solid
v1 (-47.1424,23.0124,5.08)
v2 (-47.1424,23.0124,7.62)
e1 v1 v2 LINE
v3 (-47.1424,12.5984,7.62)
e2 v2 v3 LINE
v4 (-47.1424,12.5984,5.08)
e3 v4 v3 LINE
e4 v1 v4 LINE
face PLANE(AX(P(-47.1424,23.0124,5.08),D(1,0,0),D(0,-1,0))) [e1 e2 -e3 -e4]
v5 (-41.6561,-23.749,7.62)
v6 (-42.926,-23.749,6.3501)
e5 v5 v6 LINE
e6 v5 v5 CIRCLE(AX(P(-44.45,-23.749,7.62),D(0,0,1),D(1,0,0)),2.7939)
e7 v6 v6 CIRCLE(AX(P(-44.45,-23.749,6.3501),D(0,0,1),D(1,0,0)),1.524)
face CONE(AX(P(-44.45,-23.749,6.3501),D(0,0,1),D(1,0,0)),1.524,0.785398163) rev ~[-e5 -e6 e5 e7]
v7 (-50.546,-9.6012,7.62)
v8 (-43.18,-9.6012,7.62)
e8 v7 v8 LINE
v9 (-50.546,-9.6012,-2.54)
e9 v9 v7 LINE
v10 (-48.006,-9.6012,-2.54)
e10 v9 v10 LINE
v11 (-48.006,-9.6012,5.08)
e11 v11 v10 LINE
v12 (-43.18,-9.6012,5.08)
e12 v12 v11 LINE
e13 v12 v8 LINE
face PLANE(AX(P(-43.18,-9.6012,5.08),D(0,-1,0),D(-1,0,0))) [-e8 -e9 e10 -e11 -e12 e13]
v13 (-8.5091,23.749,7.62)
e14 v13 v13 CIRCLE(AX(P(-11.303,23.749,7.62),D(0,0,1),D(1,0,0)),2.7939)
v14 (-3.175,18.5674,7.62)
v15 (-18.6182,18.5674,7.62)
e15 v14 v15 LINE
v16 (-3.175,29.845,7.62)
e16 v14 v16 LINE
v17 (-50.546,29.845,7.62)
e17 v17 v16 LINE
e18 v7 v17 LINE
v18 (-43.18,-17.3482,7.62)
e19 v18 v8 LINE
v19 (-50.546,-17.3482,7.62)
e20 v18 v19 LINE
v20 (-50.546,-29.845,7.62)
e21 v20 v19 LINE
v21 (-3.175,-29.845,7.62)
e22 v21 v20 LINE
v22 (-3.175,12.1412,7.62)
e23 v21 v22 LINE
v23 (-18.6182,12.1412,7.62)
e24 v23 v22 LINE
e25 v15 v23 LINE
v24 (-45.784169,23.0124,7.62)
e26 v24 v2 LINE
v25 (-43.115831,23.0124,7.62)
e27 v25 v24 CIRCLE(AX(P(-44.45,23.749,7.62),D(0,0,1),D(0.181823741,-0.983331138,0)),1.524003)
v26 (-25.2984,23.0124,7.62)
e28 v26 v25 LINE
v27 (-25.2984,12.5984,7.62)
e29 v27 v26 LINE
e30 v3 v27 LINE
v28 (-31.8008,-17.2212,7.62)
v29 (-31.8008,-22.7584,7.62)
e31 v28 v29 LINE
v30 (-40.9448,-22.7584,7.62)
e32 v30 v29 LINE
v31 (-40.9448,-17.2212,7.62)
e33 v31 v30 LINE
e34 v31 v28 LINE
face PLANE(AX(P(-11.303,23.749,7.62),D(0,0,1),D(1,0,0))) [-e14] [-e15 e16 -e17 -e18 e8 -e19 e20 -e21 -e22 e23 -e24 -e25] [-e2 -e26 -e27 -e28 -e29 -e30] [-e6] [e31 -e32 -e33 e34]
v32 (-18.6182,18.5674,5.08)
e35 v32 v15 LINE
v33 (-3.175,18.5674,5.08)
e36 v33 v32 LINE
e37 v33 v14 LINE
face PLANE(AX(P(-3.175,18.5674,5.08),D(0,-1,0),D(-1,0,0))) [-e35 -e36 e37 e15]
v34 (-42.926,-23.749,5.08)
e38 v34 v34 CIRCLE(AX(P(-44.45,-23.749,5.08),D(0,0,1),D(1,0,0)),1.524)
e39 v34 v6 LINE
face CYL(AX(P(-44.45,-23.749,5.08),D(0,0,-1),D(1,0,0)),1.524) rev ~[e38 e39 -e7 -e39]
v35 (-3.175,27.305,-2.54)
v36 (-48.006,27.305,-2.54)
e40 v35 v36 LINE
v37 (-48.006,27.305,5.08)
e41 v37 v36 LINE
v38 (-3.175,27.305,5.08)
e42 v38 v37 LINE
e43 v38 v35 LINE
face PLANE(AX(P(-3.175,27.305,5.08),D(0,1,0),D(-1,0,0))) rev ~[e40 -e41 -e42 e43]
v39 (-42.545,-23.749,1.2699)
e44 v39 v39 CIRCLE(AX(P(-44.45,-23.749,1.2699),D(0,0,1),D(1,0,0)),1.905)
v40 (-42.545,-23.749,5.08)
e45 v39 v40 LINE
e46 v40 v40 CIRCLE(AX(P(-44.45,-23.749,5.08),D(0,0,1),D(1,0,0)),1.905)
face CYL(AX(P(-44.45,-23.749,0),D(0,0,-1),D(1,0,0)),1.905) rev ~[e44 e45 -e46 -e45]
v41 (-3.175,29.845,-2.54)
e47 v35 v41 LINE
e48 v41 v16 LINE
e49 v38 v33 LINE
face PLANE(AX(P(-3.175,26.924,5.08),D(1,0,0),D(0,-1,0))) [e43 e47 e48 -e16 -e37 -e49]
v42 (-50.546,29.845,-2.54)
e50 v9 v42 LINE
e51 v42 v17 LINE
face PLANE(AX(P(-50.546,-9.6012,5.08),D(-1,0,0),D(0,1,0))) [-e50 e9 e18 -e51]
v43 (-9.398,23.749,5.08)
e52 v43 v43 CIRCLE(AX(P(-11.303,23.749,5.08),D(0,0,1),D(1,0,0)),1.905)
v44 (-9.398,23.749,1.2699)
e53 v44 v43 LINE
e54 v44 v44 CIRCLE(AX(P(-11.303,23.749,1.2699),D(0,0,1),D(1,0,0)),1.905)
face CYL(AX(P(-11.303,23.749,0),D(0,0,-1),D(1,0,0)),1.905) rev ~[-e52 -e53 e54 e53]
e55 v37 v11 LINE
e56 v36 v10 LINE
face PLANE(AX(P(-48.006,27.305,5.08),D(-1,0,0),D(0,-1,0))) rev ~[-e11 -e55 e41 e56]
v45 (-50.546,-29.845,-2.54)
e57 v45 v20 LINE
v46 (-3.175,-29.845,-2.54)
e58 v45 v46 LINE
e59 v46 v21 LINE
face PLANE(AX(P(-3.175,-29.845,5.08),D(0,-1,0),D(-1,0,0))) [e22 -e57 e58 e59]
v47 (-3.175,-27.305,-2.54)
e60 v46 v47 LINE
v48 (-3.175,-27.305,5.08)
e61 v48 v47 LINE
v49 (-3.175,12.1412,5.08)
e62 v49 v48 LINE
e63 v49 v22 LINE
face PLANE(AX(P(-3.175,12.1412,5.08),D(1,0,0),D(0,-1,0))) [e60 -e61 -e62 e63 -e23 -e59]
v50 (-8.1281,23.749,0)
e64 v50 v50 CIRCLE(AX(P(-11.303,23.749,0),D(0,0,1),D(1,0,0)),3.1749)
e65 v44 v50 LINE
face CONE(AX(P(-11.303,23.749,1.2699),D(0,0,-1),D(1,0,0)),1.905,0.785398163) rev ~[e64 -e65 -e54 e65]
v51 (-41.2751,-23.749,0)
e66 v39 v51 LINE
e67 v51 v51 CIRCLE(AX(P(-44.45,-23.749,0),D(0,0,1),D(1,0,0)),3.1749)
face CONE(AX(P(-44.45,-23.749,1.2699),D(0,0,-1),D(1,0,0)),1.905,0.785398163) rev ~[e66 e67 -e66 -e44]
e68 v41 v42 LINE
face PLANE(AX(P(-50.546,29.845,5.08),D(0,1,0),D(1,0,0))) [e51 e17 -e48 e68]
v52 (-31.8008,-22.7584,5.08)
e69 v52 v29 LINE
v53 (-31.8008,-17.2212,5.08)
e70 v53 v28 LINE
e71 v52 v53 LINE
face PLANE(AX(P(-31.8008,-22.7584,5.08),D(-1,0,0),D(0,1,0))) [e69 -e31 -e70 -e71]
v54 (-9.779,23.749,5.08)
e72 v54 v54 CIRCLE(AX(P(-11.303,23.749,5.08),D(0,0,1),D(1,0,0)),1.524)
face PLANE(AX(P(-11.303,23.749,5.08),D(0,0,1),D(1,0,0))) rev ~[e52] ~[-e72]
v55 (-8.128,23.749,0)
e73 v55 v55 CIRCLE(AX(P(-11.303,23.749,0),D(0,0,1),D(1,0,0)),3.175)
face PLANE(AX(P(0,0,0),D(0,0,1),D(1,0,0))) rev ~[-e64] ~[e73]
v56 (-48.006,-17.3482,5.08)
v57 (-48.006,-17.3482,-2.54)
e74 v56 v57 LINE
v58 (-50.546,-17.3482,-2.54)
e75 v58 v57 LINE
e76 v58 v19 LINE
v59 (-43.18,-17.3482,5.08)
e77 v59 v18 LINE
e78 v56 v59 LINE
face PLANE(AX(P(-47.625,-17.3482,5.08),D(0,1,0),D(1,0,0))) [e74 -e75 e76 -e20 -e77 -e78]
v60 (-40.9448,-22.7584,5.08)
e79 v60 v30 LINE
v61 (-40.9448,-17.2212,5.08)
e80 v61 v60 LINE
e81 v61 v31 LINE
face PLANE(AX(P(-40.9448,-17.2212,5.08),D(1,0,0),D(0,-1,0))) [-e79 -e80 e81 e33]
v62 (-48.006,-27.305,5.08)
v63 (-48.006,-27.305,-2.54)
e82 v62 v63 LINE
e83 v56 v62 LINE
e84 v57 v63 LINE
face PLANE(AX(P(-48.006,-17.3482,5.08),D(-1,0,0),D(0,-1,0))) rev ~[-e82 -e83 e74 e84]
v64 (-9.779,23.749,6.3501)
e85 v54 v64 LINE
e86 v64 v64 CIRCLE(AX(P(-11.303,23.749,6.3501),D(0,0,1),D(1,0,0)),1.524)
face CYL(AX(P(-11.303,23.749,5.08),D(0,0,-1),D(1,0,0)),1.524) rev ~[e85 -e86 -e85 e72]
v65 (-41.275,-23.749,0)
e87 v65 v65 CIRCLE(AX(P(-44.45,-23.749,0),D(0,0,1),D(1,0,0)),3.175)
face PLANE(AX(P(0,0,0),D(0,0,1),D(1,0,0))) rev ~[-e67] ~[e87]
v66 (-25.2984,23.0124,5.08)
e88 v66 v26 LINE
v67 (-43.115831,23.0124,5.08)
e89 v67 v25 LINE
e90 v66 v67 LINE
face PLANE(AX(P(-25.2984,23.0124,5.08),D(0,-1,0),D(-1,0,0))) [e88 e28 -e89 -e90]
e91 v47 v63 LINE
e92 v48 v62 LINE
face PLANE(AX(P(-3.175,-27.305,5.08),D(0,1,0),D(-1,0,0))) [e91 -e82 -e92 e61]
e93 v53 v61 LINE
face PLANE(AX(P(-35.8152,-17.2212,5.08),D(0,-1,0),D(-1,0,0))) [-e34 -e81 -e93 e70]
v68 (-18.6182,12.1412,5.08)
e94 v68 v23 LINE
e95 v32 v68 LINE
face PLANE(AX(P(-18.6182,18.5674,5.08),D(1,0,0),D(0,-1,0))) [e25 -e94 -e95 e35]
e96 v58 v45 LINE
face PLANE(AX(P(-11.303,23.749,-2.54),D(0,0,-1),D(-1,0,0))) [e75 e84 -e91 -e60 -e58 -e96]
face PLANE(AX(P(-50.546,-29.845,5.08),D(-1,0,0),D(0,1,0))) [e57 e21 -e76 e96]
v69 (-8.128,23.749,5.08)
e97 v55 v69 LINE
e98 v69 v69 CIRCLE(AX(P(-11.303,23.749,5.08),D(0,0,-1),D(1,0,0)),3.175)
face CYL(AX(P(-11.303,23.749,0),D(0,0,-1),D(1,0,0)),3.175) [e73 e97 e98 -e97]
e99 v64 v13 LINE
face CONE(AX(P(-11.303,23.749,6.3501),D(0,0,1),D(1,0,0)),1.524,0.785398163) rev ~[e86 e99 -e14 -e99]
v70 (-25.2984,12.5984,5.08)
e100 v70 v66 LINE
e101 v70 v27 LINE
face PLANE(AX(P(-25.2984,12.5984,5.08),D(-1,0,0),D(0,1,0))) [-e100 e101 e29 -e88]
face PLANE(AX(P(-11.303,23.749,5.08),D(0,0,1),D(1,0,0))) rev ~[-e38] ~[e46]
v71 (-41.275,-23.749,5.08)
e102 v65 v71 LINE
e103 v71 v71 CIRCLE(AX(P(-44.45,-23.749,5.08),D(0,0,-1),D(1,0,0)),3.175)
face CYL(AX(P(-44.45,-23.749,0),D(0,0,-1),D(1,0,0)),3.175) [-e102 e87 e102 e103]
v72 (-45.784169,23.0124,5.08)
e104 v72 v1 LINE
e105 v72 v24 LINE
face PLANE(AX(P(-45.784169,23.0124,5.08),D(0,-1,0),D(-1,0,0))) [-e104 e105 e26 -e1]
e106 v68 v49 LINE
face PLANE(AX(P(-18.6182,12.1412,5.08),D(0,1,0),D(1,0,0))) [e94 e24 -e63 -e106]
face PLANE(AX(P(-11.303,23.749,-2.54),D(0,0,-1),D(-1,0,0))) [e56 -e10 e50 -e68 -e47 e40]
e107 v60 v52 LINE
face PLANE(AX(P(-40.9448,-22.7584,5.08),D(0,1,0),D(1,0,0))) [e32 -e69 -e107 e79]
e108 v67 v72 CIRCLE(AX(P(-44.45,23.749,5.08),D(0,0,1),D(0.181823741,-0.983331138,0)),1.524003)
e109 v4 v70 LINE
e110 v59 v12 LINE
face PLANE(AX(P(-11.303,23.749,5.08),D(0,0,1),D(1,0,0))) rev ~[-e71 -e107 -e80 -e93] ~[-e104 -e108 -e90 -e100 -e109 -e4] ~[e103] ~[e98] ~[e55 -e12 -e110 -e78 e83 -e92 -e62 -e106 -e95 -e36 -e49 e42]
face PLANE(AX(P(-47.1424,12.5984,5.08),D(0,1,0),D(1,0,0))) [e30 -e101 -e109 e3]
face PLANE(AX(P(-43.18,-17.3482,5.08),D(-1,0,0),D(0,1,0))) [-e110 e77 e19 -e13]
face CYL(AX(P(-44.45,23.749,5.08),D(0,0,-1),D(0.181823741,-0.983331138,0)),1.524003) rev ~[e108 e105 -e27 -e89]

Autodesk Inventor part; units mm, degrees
ref_plane "YZ Plane" through (0, 0, 0) normal (1, 0, 0) x (0, 1, 0)
ref_plane "XZ Plane" through (0, 0, 0) normal (0, 1, 0) x (-1, 0, 0)
ref_plane "XY Plane" through (0, 0, 0) normal (0, 0, 1) x (1, 0, 0)
ref_plane "Work Plane1" through (0, 0, 0) normal (0, 0, 1) x (1, 0, 0)
sketch "Sketch1" plane through (0, 0, 0) normal (0, 0, 1) x (1, 0, 0)
  line L0 (-4.2367, 12.7508) -> (-4.2367, 12.8143) projected
  line L1 (-4.2367, 12.8143) -> (-9.3167, 12.8143) projected
  line L2 (-9.3167, 12.8143) -> (-9.3167, 17.8943) projected
  line L3 (-9.3167, 17.8943) -> (-4.2367, 17.8943) projected
  line L4 (-4.2367, 17.8943) -> (-4.2367, 17.9578) projected
  line L5 (-4.2367, 17.9578) -> (-3.3223, 17.9578) projected
  line L6 (-3.3223, 17.9578) -> (-3.3223, 12.7508) projected
  line L7 (-3.3223, 12.7508) -> (-4.2367, 12.7508) projected
  line L8 (-13.0251, 13.6652) -> (-13.0251, 17.0434) projected
  arc A0 (-12.2631, 17.8054) -> (-13.0251, 17.0434) centre (-12.2631, 17.0434) ccw projected
  line L9 (-12.2631, 17.8054) -> (-11.3741, 17.8054) projected
  arc A1 (-10.6121, 17.0434) -> (-11.3741, 17.8054) centre (-11.3741, 17.0434) ccw projected
  line L10 (-10.6121, 17.0434) -> (-10.6121, 13.6652) projected
  arc A2 (-11.3741, 12.9032) -> (-10.6121, 13.6652) centre (-11.3741, 13.6652) ccw projected
  line L11 (-11.3741, 12.9032) -> (-12.2631, 12.9032) projected
  arc A3 (-13.0251, 13.6652) -> (-12.2631, 12.9032) centre (-12.2631, 13.6652) ccw projected
  line L12 (-15.4407, 13.6652) -> (-15.4407, 17.0434) projected
  arc A4 (-14.6787, 17.8054) -> (-15.4407, 17.0434) centre (-14.6787, 17.0434) ccw projected
  line L13 (-14.6787, 17.8054) -> (-13.7897, 17.8054) projected
  arc A5 (-13.0277, 17.0434) -> (-13.7897, 17.8054) centre (-13.7897, 17.0434) ccw projected
  line L14 (-13.0277, 17.0434) -> (-13.0277, 13.6652) projected
  arc A6 (-13.7897, 12.9032) -> (-13.0277, 13.6652) centre (-13.7897, 13.6652) ccw projected
  line L15 (-13.7897, 12.9032) -> (-14.6787, 12.9032) projected
  arc A7 (-15.4407, 13.6652) -> (-14.6787, 12.9032) centre (-14.6787, 13.6652) ccw projected
  line L16 (-17.8562, 13.6652) -> (-17.8562, 17.0434) projected
  arc A8 (-17.0942, 17.8054) -> (-17.8562, 17.0434) centre (-17.0942, 17.0434) ccw projected
  line L17 (-17.0942, 17.8054) -> (-16.2052, 17.8054) projected
  arc A9 (-15.4432, 17.0434) -> (-16.2052, 17.8054) centre (-16.2052, 17.0434) ccw projected
  line L18 (-15.4432, 17.0434) -> (-15.4432, 13.6652) projected
  arc A10 (-16.2052, 12.9032) -> (-15.4432, 13.6652) centre (-16.2052, 13.6652) ccw projected
  line L19 (-16.2052, 12.9032) -> (-17.0942, 12.9032) projected
  arc A11 (-17.8562, 13.6652) -> (-17.0942, 12.9032) centre (-17.0942, 13.6652) ccw projected
  line L20 (-46.3804, 22.2504) -> (-44.7271, 22.2504) projected
  arc A12 (-44.1729, 22.2504) -> (-44.7271, 22.2504) centre (-44.45, 23.749) ccw projected
  line L21 (-44.1729, 22.2504) -> (-26.0604, 22.2504) projected
  line L22 (-26.0604, 22.2504) -> (-26.0604, 13.3604) projected
  line L23 (-26.0604, 13.3604) -> (-46.3804, 13.3604) projected
  line L24 (-46.3804, 13.3604) -> (-46.3804, 22.2504) projected
  line L25 (-40.1828, -21.9964) -> (-40.1828, -17.9832) projected
  line L26 (-40.1828, -17.9832) -> (-32.5628, -17.9832) projected
  line L27 (-32.5628, -17.9832) -> (-32.5628, -21.9964) projected
  line L28 (-32.5628, -21.9964) -> (-40.1828, -21.9964) projected
  line L29 (-47.625, -10.3632) -> (-41.021, -10.3632) projected
  line L30 (-43.942, -10.668) -> (-43.942, -16.2814) projected
  line L31 (-41.021, -16.5862) -> (-47.625, -16.5862) projected
  line L32 (-47.625, -26.924) -> (-47.625, -16.5862) projected
  line L33 (-3.175, -26.924) -> (-47.625, -26.924) projected
  line L34 (-3.175, -14.224) -> (-3.175, -26.924) projected
  line L35 (3.175, -14.224) -> (-3.175, -14.224) projected
  line L36 (3.175, 14.224) -> (3.175, -14.224) projected
  line L37 (-3.175, 14.224) -> (3.175, 14.224) projected
  line L38 (-3.175, 26.924) -> (-3.175, 14.224) projected
  line L39 (-47.625, 26.924) -> (-3.175, 26.924) projected
  line L40 (-47.625, -10.3632) -> (-47.625, 26.924) projected
  circle A13 centre (0, 10.414) radius 1.524 projected
  circle A14 centre (0, -10.414) radius 1.524 projected
  circle A15 centre (-44.45, -23.749) radius 1.524 projected
  circle A16 centre (-11.303, 23.749) radius 1.524 projected
  circle A17 centre (-44.45, -23.749) radius 3.175
  circle A18 centre (-11.303, 23.749) radius 3.175
  line L41 (-41.021, -10.3632) -> (-41.021, -10.668) projected
  line L42 (-41.021, -10.668) -> (-43.942, -10.668) projected
  line L43 (-43.942, -16.2814) -> (-41.021, -16.2814) projected
  line L44 (-41.021, -16.2814) -> (-41.021, -16.5862) projected
  circle A19 centre (-44.45, -23.749) radius 1.905
  circle A20 centre (-11.303, 23.749) radius 1.905
  point P0 (0, 0)
  dimension "d32" = 1.27
  dimension "d33" = 0.381
extrude "Extrusion1" add sketch "Sketch1" along normal blind 5.08 contours A18 | A17
sketch "Sketch2" plane through (-11.303, 23.749, 5.08) normal (0, 0, 1) x (1, 0, 0)
  circle A0 centre (0, 0) radius 1.524 projected
  circle A1 centre (0, 0) radius 3.175 projected
  line L0 (-22.7076, -9.8806) -> (-15.2654, -9.8806) projected
  line L1 (-22.7076, -9.8806) -> (-22.7076, -10.3886) projected
  line L2 (-22.7076, -10.3886) -> (-14.7574, -10.3886) projected
  line L3 (-14.7574, -10.3886) -> (-14.7574, -1.4986) projected
  line L4 (-14.7574, -1.4986) -> (-35.0774, -1.4986) projected
  line L5 (-35.0774, -1.4986) -> (-35.0774, -10.3886) projected
  line L6 (-35.0774, -10.3886) -> (-27.1272, -10.3886) projected
  line L7 (-27.1272, -10.3886) -> (-27.1272, -9.8806) projected
  line L8 (-34.5694, -9.8806) -> (-27.1272, -9.8806) projected
  line L9 (-34.5694, -2.0066) -> (-34.5694, -9.8806) projected
  line L10 (-15.2654, -2.0066) -> (-34.5694, -2.0066) projected
  line L11 (-15.2654, -9.8806) -> (-15.2654, -2.0066) projected
  line L12 (-23.674, -42.693) -> (-24.1312, -42.0664) projected
  line L13 (-24.1312, -42.0664) -> (-24.1312, -40.565) projected
  line L14 (-24.1312, -40.565) -> (-17.2732, -40.565) projected
  line L15 (-17.2732, -40.565) -> (-17.2732, -42.0664) projected
  line L16 (-17.2732, -42.0664) -> (-17.7304, -42.693) projected
  line L17 (-17.7304, -42.693) -> (-17.7304, -43.8162) projected
  line L18 (-17.7304, -43.8162) -> (-23.674, -43.8162) projected
  line L19 (-23.674, -43.8162) -> (-23.674, -42.693) projected
  line L20 (-17.3494, -42.8172) -> (-16.8922, -42.1906) projected
  line L21 (-16.8922, -42.1906) -> (-16.8922, -40.184) projected
  line L22 (-16.8922, -40.184) -> (-24.5122, -40.184) projected
  line L23 (-24.5122, -40.184) -> (-24.5122, -42.1906) projected
  line L24 (-24.5122, -42.1906) -> (-24.055, -42.8172) projected
  line L25 (-24.055, -42.8172) -> (-24.055, -44.1972) projected
  line L26 (-24.055, -44.1972) -> (-17.3494, -44.1972) projected
  line L27 (-17.3494, -44.1972) -> (-17.3494, -42.8172) projected
  line L28 (-24.055, -44.1972) -> (-24.5122, -44.1972) projected
  line L29 (-24.055, -42.8172) -> (-24.055, -44.1972) projected
  line L30 (-24.5122, -42.1906) -> (-24.055, -42.8172) projected
  line L31 (-24.5122, -44.1972) -> (-24.5122, -42.1906) projected
  line L32 (-16.8922, -44.1972) -> (-17.3494, -44.1972) projected
  line L33 (-16.8922, -42.1906) -> (-16.8922, -44.1972) projected
  line L34 (-16.8922, -42.1906) -> (-17.3494, -42.8172) projected
  line L35 (-17.3494, -42.8172) -> (-17.3494, -44.1972) projected
  line L36 (-36.322, -40.3352) -> (-32.639, -40.3352) projected
  line L37 (-32.639, -40.3352) -> (-32.639, -34.1122) projected
  line L38 (-32.639, -34.1122) -> (-36.322, -34.1122) projected
  line L39 (-36.322, -34.1122) -> (-36.322, -40.3352) projected
  line L40 (-5.6642, -7.4422) -> (-5.6642, -6.8072) construction
  line L41 (-5.6642, -6.8072) -> (-5.0292, -6.8072) construction
  line L42 (-5.0292, -6.8072) -> (-5.0292, -7.4422) construction
  line L43 (-5.0292, -7.4422) -> (-5.6642, -7.4422) construction
  line L44 (-5.6642, -9.9822) -> (-5.6642, -9.3472) construction
  line L45 (-5.6642, -9.3472) -> (-5.0292, -9.3472) construction
  line L46 (-5.0292, -9.3472) -> (-5.0292, -9.9822) construction
  line L47 (-5.0292, -9.9822) -> (-5.6642, -9.9822) construction
  arc A2 (-4.1402, -6.7056) -> (-4.9022, -5.9436) centre (-4.9022, -6.7056) ccw construction
  line L48 (-4.9022, -5.9436) -> (-5.7912, -5.9436) construction
  arc A3 (-5.7912, -5.9436) -> (-6.5532, -6.7056) centre (-5.7912, -6.7056) ccw construction
  line L49 (-6.5532, -6.7056) -> (-6.5532, -10.0838) construction
  arc A4 (-6.5532, -10.0838) -> (-5.7912, -10.8458) centre (-5.7912, -10.0838) ccw construction
  line L50 (-5.7912, -10.8458) -> (-4.9022, -10.8458) construction
  arc A5 (-4.9022, -10.8458) -> (-4.1402, -10.0838) centre (-4.9022, -10.0838) ccw construction
  line L51 (-4.1402, -10.0838) -> (-4.1402, -6.7056) construction
  line L52 (-3.2487, -7.4422) -> (-3.2487, -6.8072) construction
  line L53 (-3.2487, -6.8072) -> (-2.6137, -6.8072) construction
  line L54 (-2.6137, -6.8072) -> (-2.6137, -7.4422) construction
  line L55 (-2.6137, -7.4422) -> (-3.2487, -7.4422) construction
  line L56 (-3.2487, -9.9822) -> (-3.2487, -9.3472) construction
  line L57 (-3.2487, -9.3472) -> (-2.6137, -9.3472) construction
  line L58 (-2.6137, -9.3472) -> (-2.6137, -9.9822) construction
  line L59 (-2.6137, -9.9822) -> (-3.2487, -9.9822) construction
  arc A6 (-1.7247, -6.7056) -> (-2.4867, -5.9436) centre (-2.4867, -6.7056) ccw construction
  line L60 (-2.4867, -5.9436) -> (-3.3757, -5.9436) construction
  arc A7 (-3.3757, -5.9436) -> (-4.1377, -6.7056) centre (-3.3757, -6.7056) ccw construction
  line L61 (-4.1377, -6.7056) -> (-4.1377, -10.0838) construction
  arc A8 (-4.1377, -10.0838) -> (-3.3757, -10.8458) centre (-3.3757, -10.0838) ccw construction
  line L62 (-3.3757, -10.8458) -> (-2.4867, -10.8458) construction
  arc A9 (-2.4867, -10.8458) -> (-1.7247, -10.0838) centre (-2.4867, -10.0838) ccw construction
  line L63 (-1.7247, -10.0838) -> (-1.7247, -6.7056) construction
  line L64 (-0.8331, -7.4422) -> (-0.8331, -6.8072) construction
  line L65 (-0.8331, -6.8072) -> (-0.1981, -6.8072) construction
  line L66 (-0.1981, -6.8072) -> (-0.1981, -7.4422) construction
  line L67 (-0.1981, -7.4422) -> (-0.8331, -7.4422) construction
  line L68 (-0.8331, -9.9822) -> (-0.8331, -9.3472) construction
  line L69 (-0.8331, -9.3472) -> (-0.1981, -9.3472) construction
  line L70 (-0.1981, -9.3472) -> (-0.1981, -9.9822) construction
  line L71 (-0.1981, -9.9822) -> (-0.8331, -9.9822) construction
  arc A10 (0.6909, -6.7056) -> (-0.0711, -5.9436) centre (-0.0711, -6.7056) ccw construction
  line L72 (-0.0711, -5.9436) -> (-0.9601, -5.9436) construction
  arc A11 (-0.9601, -5.9436) -> (-1.7221, -6.7056) centre (-0.9601, -6.7056) ccw construction
  line L73 (-1.7221, -6.7056) -> (-1.7221, -10.0838) construction
  arc A12 (-1.7221, -10.0838) -> (-0.9601, -10.8458) centre (-0.9601, -10.0838) ccw construction
  line L74 (-0.9601, -10.8458) -> (-0.0711, -10.8458) construction
  arc A13 (-0.0711, -10.8458) -> (0.6909, -10.0838) centre (-0.0711, -10.0838) ccw construction
  line L75 (0.6909, -10.0838) -> (0.6909, -6.7056) construction
  line L76 (4.2088, -9.3472) -> (4.8438, -9.3472) construction
  line L77 (4.8438, -9.3472) -> (4.8438, -9.9822) construction
  line L78 (4.8438, -9.9822) -> (4.2088, -9.9822) construction
  line L79 (4.2088, -9.9822) -> (4.2088, -9.3472) construction
  line L80 (4.8438, -6.8072) -> (4.8438, -7.4422) construction
  line L81 (4.8438, -7.4422) -> (4.2088, -7.4422) construction
  line L82 (4.2088, -7.4422) -> (4.2088, -6.8072) construction
  line L83 (4.2088, -6.8072) -> (4.8438, -6.8072) construction
  line L84 (7.0663, -5.8547) -> (1.9863, -5.8547) construction
  line L85 (1.9863, -5.8547) -> (1.9863, -10.9347) construction
  line L86 (1.9863, -10.9347) -> (7.0663, -10.9347) construction
  line L87 (7.0663, -10.9347) -> (7.0663, -5.8547) construction
  line L88 (7.0663, -7.0612) -> (7.9807, -7.0612) construction
  line L89 (7.9807, -5.7912) -> (7.9807, -7.0612) construction
  line L90 (7.0663, -5.7912) -> (7.9807, -5.7912) construction
  line L91 (7.0663, -5.7912) -> (7.0663, -7.0612) construction
  line L92 (7.9807, -9.7282) -> (7.0663, -9.7282) construction
  line L93 (7.0663, -9.7282) -> (7.0663, -10.9982) construction
  line L94 (7.0663, -10.9982) -> (7.9807, -10.9982) construction
  line L95 (7.9807, -9.7282) -> (7.9807, -10.9982) construction
  line L96 (7.9807, -5.7912) -> (7.9807, -10.9982) construction
  line L97 (14.478, -9.525) -> (14.478, -37.973) projected
  line L98 (14.478, -37.973) -> (8.128, -37.973) projected
  line L99 (8.128, -37.973) -> (8.128, -50.673) projected
  line L100 (8.128, -50.673) -> (-36.322, -50.673) projected
  line L101 (-36.322, -34.1122) -> (-36.322, 3.175) projected
  line L102 (-36.322, 3.175) -> (8.128, 3.175) projected
  line L103 (-22.7076, -10.3886) -> (-27.1272, -10.3886) projected
  line L104 (-14.7574, -10.3886) -> (-35.0774, -10.3886) projected
  line L105 (-14.7574, -1.4986) -> (-14.7574, -10.3886) projected
  line L106 (-14.7574, -1.4986) -> (-35.0774, -1.4986) projected
  line L107 (-35.8394, -11.1506) -> (-13.9954, -11.1506)
  line L108 (-13.9954, -11.1506) -> (-13.9954, -0.7366)
  line L109 (-13.9954, -0.7366) -> (-35.8394, -0.7366)
  line L110 (-35.8394, -0.7366) -> (-35.8394, -11.1506)
  line L111 (-29.6418, -46.5074) -> (-20.4978, -46.5074)
  line L112 (-20.4978, -46.5074) -> (-20.4978, -40.9702)
  line L113 (-20.4978, -40.9702) -> (-29.6418, -40.9702)
  line L114 (-29.6418, -40.9702) -> (-29.6418, -46.5074)
  line L115 (-7.3152, -11.6078) -> (8.128, -11.6078)
  line L116 (8.128, -5.1816) -> (-7.3152, -5.1816)
  line L117 (-7.3152, -5.1816) -> (-7.3152, -11.6078)
  line L118 (-31.877, -33.3502) -> (-39.243, -33.3502)
  line L119 (-39.243, -41.0972) -> (-31.877, -41.0972)
  line L120 (-31.877, -41.0972) -> (-31.877, -33.3502)
  line L121 (8.128, -53.594) -> (-39.243, -53.594)
  line L122 (-39.243, 6.096) -> (8.128, 6.096)
  circle A14 centre (-33.147, -47.498) radius 1.524 projected
  line L123 (7.0663, -10.9982) -> (7.0663, -10.9347) construction
  line L124 (7.0663, -10.9347) -> (1.9863, -10.9347) construction
  line L125 (1.9863, -10.9347) -> (1.9863, -5.8547) construction
  line L126 (1.9863, -5.8547) -> (7.0663, -5.8547) construction
  line L127 (7.0663, -5.8547) -> (7.0663, -5.7912) construction
  line L128 (7.0663, -5.7912) -> (7.9807, -5.7912) construction
  line L129 (7.9807, -5.7912) -> (7.9807, -10.9982) construction
  line L130 (7.9807, -10.9982) -> (7.0663, -10.9982) construction
  line L131 (-1.7221, -10.0838) -> (-1.7221, -6.7056) construction
  arc A15 (-0.9601, -5.9436) -> (-1.7221, -6.7056) centre (-0.9601, -6.7056) ccw construction
  line L132 (-0.9601, -5.9436) -> (-0.0711, -5.9436) construction
  arc A16 (0.6909, -6.7056) -> (-0.0711, -5.9436) centre (-0.0711, -6.7056) ccw construction
  line L133 (0.6909, -6.7056) -> (0.6909, -10.0838) construction
  arc A17 (-0.0711, -10.8458) -> (0.6909, -10.0838) centre (-0.0711, -10.0838) ccw construction
  line L134 (-0.0711, -10.8458) -> (-0.9601, -10.8458) construction
  arc A18 (-1.7221, -10.0838) -> (-0.9601, -10.8458) centre (-0.9601, -10.0838) ccw construction
  line L135 (-4.1377, -10.0838) -> (-4.1377, -6.7056) construction
  arc A19 (-3.3757, -5.9436) -> (-4.1377, -6.7056) centre (-3.3757, -6.7056) ccw construction
  line L136 (-3.3757, -5.9436) -> (-2.4867, -5.9436) construction
  arc A20 (-1.7247, -6.7056) -> (-2.4867, -5.9436) centre (-2.4867, -6.7056) ccw construction
  line L137 (-1.7247, -6.7056) -> (-1.7247, -10.0838) construction
  arc A21 (-2.4867, -10.8458) -> (-1.7247, -10.0838) centre (-2.4867, -10.0838) ccw construction
  line L138 (-2.4867, -10.8458) -> (-3.3757, -10.8458) construction
  arc A22 (-4.1377, -10.0838) -> (-3.3757, -10.8458) centre (-3.3757, -10.0838) ccw construction
  line L139 (-6.5532, -10.0838) -> (-6.5532, -6.7056) construction
  arc A23 (-5.7912, -5.9436) -> (-6.5532, -6.7056) centre (-5.7912, -6.7056) ccw construction
  line L140 (-5.7912, -5.9436) -> (-4.9022, -5.9436) construction
  arc A24 (-4.1402, -6.7056) -> (-4.9022, -5.9436) centre (-4.9022, -6.7056) ccw construction
  line L141 (-4.1402, -6.7056) -> (-4.1402, -10.0838) construction
  arc A25 (-4.9022, -10.8458) -> (-4.1402, -10.0838) centre (-4.9022, -10.0838) ccw construction
  line L142 (-4.9022, -10.8458) -> (-5.7912, -10.8458) construction
  arc A26 (-6.5532, -10.0838) -> (-5.7912, -10.8458) centre (-5.7912, -10.0838) ccw construction
  line L143 (-35.0774, -1.4986) -> (-33.4241, -1.4986) projected
  arc A27 (-32.8699, -1.4986) -> (-33.4241, -1.4986) centre (-33.147, 0) ccw projected
  line L144 (-32.8699, -1.4986) -> (-14.7574, -1.4986) projected
  line L145 (-14.7574, -1.4986) -> (-14.7574, -10.3886) projected
  line L146 (-14.7574, -10.3886) -> (-35.0774, -10.3886) projected
  line L147 (-35.0774, -10.3886) -> (-35.0774, -1.4986) projected
  line L148 (-24.5122, -44.1972) -> (-24.5122, -40.184) projected
  line L149 (-24.5122, -40.184) -> (-16.8922, -40.184) projected
  line L150 (-16.8922, -40.184) -> (-16.8922, -44.1972) projected
  line L151 (-16.8922, -44.1972) -> (-24.5122, -44.1972) projected
  line L152 (-36.322, -34.1122) -> (-32.639, -34.1122) projected
  line L153 (-32.639, -34.1122) -> (-32.639, -40.3352) projected
  line L154 (-32.639, -40.3352) -> (-36.322, -40.3352) projected
  line L155 (-36.322, -50.673) -> (-36.322, -40.3352) projected
  line L156 (8.128, -50.673) -> (-36.322, -50.673) projected
  line L157 (8.128, -37.973) -> (8.128, -50.673) projected
  line L158 (14.478, -37.973) -> (8.128, -37.973) projected
  line L159 (14.478, -9.525) -> (14.478, -37.973) projected
  line L160 (8.128, -9.525) -> (14.478, -9.525) projected
  line L161 (8.128, 3.175) -> (8.128, -9.525) projected
  line L162 (-36.322, 3.175) -> (8.128, 3.175) projected
  line L163 (-36.322, -34.1122) -> (-36.322, 3.175) projected
  circle A28 centre (11.303, -13.335) radius 1.524 projected
  circle A29 centre (11.303, -34.163) radius 1.524 projected
  circle A30 centre (-33.147, -47.498) radius 1.524 projected
  circle A31 centre (0, 0) radius 1.524 projected
  line L164 (8.128, 6.096) -> (8.128, -5.1816)
  line L165 (8.128, -11.6078) -> (8.128, -53.594)
  line L166 (-39.243, -53.594) -> (-39.243, -41.0972)
  line L167 (-39.243, -33.3502) -> (-39.243, 6.096)
  line L168 (-41.5103, -40.184) -> (-41.5103, -40.3352)
  line L169 (-28.8798, -41.7322) -> (-28.8798, -43.7388) projected
  line L170 (-21.2598, -41.7322) -> (-28.8798, -41.7322) projected
  line L171 (-28.4226, -45.7454) -> (-21.717, -45.7454) projected
  line L172 (-21.2598, -43.7388) -> (-21.2598, -45.7454) projected
  point P0 (11.303, -23.749)
  point P1 (-36.322, -38.9382)
  point P2 (-36.322, -35.5092)
  dimension "d3" = 0.762
  dimension "d4" = 0.762
  dimension "d5" = 0.762
  dimension "d6" = 0.762
  dimension "d7" = 0.762
  dimension "d8" = 0.762
  dimension "d9" = 0.762
  dimension "d10" = 0.762
  dimension "d11" = 0.762
  dimension "d12" = 0.762
  dimension "d18" = 2.921
  dimension "d19" = 2.921
  dimension "d28" = 0.762
  dimension "d29" = 0.762
  dimension "d30" = 0.762
  dimension "d31" = 0.762
extrude "Extrusion2" add sketch "Sketch2" along normal blind 2.54 contours A1 | L102 L161 L116 L117 L115 L165 L99 L100 L155 L119 L120 L118 L101 | L102 L101 L118 L167 L122 L164 | L155 L100 L165 L121 L166 L119 | L113 L23 L22 L21 L20 L27 L26 L112 L18 L17 L16 L15 L14 L13 | L13 L14 L15 L16 L17 L18 L112 L113 | L27 L20 L33 L32
sketch "Sketch3" plane through (-11.303, 23.749, 5.08) normal (0, 0, -1) x (-1, 0, 0)
  line L0 (-8.128, -5.1816) -> (-8.128, 6.096) projected
  line L1 (39.243, -53.594) -> (-8.128, -53.594) projected
  line L2 (39.243, -33.3502) -> (31.877, -33.3502) projected
  line L3 (39.243, 6.096) -> (39.243, -33.3502) projected
  line L4 (39.243, -41.0972) -> (36.703, -41.0972)
  line L5 (36.703, -41.0972) -> (36.703, -53.594)
  line L6 (36.703, -53.594) -> (39.243, -53.594)
  line L7 (39.243, -53.594) -> (39.243, -41.0972)
  line L8 (39.243, -53.594) -> (-8.128, -53.594) projected
  line L9 (-8.128, -53.594) -> (-8.128, -11.6078) projected
  line L10 (39.243, -53.594) -> (-8.128, -53.594)
  line L11 (-8.128, -53.594) -> (-8.128, -51.054)
  line L12 (-8.128, -51.054) -> (39.243, -51.054)
  line L13 (39.243, -51.054) -> (39.243, -53.594)
  line L14 (39.243, 6.096) -> (39.243, -33.3502) projected
  line L15 (39.243, 6.096) -> (36.703, 6.096)
  line L16 (36.703, 6.096) -> (36.703, -33.3502)
  line L17 (36.703, -33.3502) -> (39.243, -33.3502)
  line L18 (39.243, -33.3502) -> (39.243, 6.096)
  line L19 (39.243, 6.096) -> (-8.128, 6.096)
  line L20 (-8.128, 6.096) -> (-8.128, 3.556)
  line L21 (-8.128, 3.556) -> (39.243, 3.556)
  line L22 (39.243, 3.556) -> (39.243, 6.096)
  point P0 (-11.303, -23.749)
  dimension "d22" = 2.54
  dimension "d23" = 2.54
  dimension "d24" = 2.54
  dimension "d25" = 2.54
extrude "Extrusion3" add sketch "Sketch3" along normal blind 7.62
sketch "Sketch4" plane through (-11.303, 23.749, -2.54) normal (0, 0, -1) x (-1, 0, 0)
  line L0 (36.703, -51.054) -> (-8.128, -51.054) projected
  line L1 (-8.128, -51.054) -> (-8.128, -53.594) projected
  line L2 (-8.128, -53.594) -> (39.243, -53.594) projected
  line L3 (39.243, -53.594) -> (39.243, -41.0972) projected
  line L4 (39.243, -41.0972) -> (36.703, -41.0972) projected
  line L5 (36.703, -41.0972) -> (36.703, -51.054) projected
  point P0 (-11.303, -23.749)
chamfer "Chamfer1" distance 1.27 angle 45 4 edges at (-45.974, -23.749, 7.62) (-12.827, 23.749, 7.62) (-13.208, 23.749, 0) (-46.355, -23.749, 0)
equation "\"d4\" = d3"
equation "\"d5\" = d4"
equation "\"d6\" = d3"
equation "\"d7\" = d6"
equation "\"d8\" = d6"
equation "\"d9\" = d6"
equation "\"d10\" = d9"
equation "\"d11\" = d10"
equation "\"d12\" = d11"
equation "\"d18\" = d17"
equation "\"d19\" = d17"
equation "\"d28\" = d3"
equation "\"d29\" = d3"
equation "\"d30\" = d3"
equation "\"d31\" = d3"
equation "\"d23\" = d22"
equation "\"d17\" = 2.921"
properties part number "backCase"
